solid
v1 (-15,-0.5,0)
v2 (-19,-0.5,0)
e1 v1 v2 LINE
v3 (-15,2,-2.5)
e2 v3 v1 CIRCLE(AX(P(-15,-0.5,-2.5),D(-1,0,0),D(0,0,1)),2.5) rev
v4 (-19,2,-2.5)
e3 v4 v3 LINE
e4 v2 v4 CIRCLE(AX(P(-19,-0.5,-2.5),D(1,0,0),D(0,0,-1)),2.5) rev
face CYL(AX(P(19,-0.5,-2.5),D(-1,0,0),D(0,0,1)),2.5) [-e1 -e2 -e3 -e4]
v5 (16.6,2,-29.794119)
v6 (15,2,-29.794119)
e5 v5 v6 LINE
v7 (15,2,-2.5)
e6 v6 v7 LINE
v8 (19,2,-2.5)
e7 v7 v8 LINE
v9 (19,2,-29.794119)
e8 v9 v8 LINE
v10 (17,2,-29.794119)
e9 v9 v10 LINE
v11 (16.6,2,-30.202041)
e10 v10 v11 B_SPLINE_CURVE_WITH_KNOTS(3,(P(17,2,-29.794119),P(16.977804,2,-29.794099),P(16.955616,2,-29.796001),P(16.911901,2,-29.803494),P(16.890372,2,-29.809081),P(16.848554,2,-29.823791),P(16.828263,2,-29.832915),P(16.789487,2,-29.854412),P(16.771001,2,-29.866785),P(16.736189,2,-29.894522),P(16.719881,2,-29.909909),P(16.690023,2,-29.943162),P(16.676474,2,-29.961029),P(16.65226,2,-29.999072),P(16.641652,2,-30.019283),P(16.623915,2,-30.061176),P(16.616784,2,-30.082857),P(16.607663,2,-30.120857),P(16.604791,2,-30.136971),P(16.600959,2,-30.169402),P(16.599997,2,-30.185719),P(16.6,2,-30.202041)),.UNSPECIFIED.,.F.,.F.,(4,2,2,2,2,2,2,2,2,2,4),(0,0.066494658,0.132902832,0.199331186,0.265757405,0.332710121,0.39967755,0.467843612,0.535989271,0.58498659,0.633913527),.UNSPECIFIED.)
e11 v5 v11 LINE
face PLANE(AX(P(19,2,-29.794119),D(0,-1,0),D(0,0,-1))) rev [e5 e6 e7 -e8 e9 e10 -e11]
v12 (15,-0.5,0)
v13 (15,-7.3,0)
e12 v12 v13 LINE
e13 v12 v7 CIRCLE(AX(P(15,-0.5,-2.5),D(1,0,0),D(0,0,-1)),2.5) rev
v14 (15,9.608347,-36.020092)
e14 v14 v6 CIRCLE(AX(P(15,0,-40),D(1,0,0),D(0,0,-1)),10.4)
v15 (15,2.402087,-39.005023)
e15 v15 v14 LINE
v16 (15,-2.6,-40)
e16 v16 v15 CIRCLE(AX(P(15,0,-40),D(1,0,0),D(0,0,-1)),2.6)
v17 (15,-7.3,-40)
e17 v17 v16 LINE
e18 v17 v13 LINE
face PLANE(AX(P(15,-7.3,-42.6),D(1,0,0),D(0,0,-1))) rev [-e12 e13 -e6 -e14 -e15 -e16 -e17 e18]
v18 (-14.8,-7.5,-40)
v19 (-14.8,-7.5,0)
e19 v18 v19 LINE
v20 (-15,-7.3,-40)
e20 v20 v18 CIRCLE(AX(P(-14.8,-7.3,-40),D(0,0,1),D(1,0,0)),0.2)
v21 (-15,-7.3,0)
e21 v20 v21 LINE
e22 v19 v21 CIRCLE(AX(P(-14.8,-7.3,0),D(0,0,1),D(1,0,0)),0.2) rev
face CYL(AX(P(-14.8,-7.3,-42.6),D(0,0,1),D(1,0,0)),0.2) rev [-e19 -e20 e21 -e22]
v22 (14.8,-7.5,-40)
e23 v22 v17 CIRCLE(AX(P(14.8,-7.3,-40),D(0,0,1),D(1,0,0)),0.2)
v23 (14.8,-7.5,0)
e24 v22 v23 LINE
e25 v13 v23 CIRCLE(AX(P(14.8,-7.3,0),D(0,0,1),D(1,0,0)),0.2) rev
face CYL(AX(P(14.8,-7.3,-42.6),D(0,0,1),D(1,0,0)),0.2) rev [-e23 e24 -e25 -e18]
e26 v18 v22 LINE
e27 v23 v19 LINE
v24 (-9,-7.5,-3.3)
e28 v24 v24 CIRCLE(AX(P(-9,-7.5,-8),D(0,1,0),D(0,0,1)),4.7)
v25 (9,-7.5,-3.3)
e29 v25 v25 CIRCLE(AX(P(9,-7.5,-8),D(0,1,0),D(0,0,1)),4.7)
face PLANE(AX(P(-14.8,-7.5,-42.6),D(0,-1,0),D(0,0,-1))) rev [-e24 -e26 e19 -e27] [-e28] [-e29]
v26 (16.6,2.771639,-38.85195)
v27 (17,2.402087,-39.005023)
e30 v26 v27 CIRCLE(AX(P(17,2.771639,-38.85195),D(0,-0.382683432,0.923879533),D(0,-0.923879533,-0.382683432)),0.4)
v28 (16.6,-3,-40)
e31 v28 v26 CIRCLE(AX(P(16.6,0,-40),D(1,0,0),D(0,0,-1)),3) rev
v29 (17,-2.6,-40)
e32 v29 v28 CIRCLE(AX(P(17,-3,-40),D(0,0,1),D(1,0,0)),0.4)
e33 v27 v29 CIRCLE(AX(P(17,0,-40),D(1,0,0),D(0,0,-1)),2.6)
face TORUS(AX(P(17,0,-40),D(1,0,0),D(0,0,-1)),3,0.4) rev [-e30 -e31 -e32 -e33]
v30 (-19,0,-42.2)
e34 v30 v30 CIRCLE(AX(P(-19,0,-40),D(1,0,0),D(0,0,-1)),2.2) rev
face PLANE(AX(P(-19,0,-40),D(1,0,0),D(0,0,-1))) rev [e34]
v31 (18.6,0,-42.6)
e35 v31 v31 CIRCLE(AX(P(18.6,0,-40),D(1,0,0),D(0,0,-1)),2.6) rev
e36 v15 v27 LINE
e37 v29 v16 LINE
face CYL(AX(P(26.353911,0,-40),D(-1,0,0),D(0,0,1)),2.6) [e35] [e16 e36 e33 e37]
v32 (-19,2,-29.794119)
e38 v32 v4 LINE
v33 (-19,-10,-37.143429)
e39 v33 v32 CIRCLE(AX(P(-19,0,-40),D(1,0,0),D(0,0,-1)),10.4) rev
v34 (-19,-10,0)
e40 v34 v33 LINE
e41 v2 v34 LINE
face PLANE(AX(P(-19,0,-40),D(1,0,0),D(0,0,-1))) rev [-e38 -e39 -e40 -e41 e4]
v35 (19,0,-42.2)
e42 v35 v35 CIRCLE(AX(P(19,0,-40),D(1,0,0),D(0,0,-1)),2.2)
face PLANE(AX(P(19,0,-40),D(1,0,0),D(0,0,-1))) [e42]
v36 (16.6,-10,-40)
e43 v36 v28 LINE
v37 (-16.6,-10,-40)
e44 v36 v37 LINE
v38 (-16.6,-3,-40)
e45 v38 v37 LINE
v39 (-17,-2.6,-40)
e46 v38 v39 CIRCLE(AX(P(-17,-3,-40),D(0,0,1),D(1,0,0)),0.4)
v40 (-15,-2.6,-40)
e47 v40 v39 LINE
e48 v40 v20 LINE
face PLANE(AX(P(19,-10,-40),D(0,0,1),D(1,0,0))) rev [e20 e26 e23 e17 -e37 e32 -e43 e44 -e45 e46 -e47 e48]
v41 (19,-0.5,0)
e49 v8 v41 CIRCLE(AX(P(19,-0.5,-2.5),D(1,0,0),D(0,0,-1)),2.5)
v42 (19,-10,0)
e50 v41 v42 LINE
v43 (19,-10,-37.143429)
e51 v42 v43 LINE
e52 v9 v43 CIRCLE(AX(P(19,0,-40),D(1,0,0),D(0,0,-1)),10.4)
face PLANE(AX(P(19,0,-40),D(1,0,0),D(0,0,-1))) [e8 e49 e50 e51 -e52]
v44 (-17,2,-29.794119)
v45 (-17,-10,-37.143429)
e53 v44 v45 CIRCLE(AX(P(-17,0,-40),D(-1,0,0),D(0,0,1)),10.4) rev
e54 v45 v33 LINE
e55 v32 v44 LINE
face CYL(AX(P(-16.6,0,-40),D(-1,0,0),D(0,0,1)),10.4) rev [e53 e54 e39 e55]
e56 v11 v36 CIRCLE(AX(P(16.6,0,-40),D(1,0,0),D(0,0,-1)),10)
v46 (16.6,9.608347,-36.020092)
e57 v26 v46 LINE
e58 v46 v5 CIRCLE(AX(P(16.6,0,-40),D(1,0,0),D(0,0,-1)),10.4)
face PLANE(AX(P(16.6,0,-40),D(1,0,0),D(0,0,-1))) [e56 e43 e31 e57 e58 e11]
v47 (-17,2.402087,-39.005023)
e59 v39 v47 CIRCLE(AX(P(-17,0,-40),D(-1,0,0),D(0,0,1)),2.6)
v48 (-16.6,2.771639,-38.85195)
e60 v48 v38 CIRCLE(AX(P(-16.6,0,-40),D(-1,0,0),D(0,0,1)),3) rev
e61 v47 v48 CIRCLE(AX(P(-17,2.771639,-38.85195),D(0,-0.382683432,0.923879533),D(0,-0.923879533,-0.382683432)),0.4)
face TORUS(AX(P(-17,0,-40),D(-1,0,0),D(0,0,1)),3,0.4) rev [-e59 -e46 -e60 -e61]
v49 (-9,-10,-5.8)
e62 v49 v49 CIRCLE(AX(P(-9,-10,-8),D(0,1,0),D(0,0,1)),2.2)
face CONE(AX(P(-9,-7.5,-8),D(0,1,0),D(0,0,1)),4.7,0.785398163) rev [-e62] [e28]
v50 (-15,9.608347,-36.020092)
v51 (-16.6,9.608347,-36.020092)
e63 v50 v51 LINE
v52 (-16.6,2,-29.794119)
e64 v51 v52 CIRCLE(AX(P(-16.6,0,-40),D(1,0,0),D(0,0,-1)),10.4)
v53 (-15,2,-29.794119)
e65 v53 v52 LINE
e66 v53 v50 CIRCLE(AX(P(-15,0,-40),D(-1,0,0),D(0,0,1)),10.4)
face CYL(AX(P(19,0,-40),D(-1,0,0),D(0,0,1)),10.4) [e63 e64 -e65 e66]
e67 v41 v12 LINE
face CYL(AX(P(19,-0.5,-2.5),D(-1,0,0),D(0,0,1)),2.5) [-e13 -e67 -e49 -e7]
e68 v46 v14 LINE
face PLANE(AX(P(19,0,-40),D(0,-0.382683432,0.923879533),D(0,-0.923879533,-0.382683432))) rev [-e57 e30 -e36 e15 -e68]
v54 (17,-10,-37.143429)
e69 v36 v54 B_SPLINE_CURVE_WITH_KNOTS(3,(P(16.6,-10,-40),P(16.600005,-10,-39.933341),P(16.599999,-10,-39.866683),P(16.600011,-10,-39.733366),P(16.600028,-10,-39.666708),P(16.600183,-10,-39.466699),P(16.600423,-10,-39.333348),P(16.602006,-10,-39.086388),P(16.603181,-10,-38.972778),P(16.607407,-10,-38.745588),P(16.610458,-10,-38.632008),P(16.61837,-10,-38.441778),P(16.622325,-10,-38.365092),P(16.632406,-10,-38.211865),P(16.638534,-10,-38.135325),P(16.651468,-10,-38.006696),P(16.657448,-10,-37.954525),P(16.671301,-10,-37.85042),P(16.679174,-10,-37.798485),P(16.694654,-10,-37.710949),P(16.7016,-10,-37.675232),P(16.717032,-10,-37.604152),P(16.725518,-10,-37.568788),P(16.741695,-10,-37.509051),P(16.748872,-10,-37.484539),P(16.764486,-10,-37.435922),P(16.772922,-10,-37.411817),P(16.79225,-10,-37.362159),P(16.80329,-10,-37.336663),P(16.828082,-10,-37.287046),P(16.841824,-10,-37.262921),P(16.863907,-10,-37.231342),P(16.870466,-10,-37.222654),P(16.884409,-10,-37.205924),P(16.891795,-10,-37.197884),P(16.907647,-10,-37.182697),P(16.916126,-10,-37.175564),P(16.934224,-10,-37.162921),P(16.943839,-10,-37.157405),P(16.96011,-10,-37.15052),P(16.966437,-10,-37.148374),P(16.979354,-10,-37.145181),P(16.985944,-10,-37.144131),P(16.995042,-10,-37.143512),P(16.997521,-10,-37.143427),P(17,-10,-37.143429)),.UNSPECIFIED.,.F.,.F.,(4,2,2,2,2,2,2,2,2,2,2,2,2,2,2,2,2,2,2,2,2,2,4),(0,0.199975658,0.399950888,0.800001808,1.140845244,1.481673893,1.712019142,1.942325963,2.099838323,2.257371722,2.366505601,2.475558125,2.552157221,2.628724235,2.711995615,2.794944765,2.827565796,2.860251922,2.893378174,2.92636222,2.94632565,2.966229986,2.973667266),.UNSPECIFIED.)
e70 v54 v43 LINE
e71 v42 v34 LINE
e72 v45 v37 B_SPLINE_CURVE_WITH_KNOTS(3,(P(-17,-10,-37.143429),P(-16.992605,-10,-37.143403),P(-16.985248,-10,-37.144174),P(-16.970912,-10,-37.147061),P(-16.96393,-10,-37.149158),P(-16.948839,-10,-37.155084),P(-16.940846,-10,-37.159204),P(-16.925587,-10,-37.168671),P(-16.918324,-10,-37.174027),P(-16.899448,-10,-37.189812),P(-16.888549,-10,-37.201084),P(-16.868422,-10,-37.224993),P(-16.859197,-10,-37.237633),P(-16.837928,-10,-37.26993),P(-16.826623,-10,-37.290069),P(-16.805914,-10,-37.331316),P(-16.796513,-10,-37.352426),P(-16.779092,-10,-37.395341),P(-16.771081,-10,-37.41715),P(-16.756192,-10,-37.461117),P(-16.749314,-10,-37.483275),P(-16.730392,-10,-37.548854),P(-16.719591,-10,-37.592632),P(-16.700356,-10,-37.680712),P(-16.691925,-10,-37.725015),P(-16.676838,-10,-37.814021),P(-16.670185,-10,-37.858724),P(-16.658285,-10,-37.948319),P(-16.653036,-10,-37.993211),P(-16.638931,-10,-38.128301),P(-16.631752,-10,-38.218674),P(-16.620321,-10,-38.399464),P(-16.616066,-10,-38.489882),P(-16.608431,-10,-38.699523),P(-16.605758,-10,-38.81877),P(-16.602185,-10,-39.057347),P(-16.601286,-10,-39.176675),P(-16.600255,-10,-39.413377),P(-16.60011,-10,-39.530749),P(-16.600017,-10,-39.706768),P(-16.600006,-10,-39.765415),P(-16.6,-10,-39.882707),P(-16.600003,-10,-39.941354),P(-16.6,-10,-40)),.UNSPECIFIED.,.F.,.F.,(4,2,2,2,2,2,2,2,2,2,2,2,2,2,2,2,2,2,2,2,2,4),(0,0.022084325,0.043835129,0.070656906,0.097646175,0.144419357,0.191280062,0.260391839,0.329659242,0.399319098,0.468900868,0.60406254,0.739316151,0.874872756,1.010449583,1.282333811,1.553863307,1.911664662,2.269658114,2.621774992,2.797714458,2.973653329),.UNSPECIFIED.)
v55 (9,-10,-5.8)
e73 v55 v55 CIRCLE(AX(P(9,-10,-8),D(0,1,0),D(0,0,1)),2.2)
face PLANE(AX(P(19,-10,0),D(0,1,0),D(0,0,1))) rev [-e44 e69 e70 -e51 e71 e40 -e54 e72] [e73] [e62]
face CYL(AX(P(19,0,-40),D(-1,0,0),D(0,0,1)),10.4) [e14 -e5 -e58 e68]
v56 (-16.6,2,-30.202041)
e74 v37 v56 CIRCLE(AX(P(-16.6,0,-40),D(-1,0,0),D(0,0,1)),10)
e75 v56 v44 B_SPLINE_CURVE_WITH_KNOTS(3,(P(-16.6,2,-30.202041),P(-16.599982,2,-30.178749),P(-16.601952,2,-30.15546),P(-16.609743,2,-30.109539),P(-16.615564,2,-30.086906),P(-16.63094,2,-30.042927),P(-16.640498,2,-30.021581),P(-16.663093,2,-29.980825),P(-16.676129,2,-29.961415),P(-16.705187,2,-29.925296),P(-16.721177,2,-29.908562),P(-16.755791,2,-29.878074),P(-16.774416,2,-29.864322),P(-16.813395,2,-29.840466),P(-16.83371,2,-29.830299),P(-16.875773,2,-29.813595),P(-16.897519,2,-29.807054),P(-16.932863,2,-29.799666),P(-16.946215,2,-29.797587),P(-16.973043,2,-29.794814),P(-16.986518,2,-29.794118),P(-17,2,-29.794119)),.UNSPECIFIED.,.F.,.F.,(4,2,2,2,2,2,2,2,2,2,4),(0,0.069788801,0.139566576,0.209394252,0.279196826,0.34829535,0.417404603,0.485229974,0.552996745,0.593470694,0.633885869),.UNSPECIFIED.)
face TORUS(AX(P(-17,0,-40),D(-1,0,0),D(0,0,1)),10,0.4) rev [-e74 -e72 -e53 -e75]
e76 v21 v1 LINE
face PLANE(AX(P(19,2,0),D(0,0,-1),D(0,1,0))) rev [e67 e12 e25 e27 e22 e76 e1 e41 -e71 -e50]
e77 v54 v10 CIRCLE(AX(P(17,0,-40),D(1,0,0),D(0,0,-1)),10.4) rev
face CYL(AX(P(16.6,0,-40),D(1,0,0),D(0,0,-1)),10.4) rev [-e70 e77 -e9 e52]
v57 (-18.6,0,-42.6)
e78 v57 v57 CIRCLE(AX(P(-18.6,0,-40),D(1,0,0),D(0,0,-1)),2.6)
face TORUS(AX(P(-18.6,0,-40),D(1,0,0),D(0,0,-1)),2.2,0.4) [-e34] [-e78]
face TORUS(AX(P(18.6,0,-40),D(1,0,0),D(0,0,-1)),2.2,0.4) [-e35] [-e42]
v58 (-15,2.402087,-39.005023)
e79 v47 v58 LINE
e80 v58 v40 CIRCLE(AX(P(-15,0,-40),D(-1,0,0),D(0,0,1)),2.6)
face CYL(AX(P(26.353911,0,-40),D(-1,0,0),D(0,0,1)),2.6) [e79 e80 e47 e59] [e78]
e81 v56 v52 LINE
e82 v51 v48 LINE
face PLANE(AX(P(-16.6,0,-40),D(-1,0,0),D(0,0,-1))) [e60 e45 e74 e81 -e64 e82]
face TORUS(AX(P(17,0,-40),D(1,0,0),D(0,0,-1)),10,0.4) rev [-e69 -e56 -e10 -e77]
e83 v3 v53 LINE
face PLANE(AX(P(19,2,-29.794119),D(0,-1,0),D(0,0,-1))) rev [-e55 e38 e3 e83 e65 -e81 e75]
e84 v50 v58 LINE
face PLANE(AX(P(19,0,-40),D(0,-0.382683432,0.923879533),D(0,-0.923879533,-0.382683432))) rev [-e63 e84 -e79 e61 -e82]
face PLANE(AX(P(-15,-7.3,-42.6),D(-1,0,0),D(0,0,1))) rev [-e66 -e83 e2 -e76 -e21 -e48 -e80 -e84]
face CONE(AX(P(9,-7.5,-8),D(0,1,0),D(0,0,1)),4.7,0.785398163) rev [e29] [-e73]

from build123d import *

# Parameters (mm, degrees)
BOSS_EXTRUDE5_START             = -19
BOSS_EXTRUDE5_DEPTH             = 38
CUT_EXTRUDE1_START              = -2.4
CUT_EXTRUDE1_DEPTH              = 2.4
BOSS_EXTRUDE4_REACH             = 47.398
SKETCH5_R                       = 2.6
BOSS_EXTRUDE4_DIRECTION_2_REACH = 47.398
CUT_EXTRUDE3_DEPTH              = 48.70492637
CUT_EXTRUDE3_DEPTH_BACK         = 48.70492637
FILLET17_R                      = 0.4
FILLET_1_R                      = 2.5
HOLE_WIZARD_M41_D               = 4.2
HOLE_WIZARD_M41_DEPTH           = 8.5
HOLE_WIZARD_M41_CSINK_D         = 9.4
HOLE_WIZARD_M41_CSINK_ANGLE     = 90
HOLE_WIZARD_M41_TIP             = 1.2618073


# Read off the part's stored shape, not the designer's step: Boss-Extrude5
with BuildPart() as part:
    # Boss-Extrude5 outline → Boss-Extrude5 (new body)
    with BuildSketch(Plane(origin=(0, 0, 0), x_dir=(0, 0, -1), z_dir=(1, 0, 0)).offset(BOSS_EXTRUDE5_START)):
        with BuildLine():
            Line((0, -10), (40, -10))
            Line((40, -10), (40, 0))
            Line((40, 0), (36.020092303, 9.608347138))
            ThreePointArc((36.020092303, 9.608347138), (31.951342699, 6.586282384), (29.794119342, 2))
            Line((29.794119342, 2), (0, 2))
            Line((0, 2), (0, -10))
        make_face()
    extrude(amount=BOSS_EXTRUDE5_DEPTH)

    # Sketch4 → Cut-Extrude1 (cut)
    with BuildSketch(Plane(origin=(19, 0, 0), x_dir=(0, 0, -1), z_dir=(1, 0, 0)).offset(CUT_EXTRUDE1_START)):
        with BuildLine():
            Line((32.646089476, 7.353910524), (50.4, 25.107821049))
            Line((50.4, 25.107821049), (50.4, 0))
            ThreePointArc((50.4, 0), (36.020092303, -9.608347138), (32.646089476, 7.353910524))
        make_face()
    cut_extrude1 = extrude(amount=CUT_EXTRUDE1_DEPTH, mode=Mode.SUBTRACT)

    # Mirror1: Cut-Extrude1 across plane
    add(cut_extrude1.mirror(Plane(origin=(0, 0, 0), x_dir=(0, 0, 1), z_dir=(1, 0, 0))), mode=Mode.SUBTRACT)

    # Boss-Extrude4: up to this face of the body (flat: up to its plane)
    boss_extrude4_end = Plane(part.part.faces().sort_by_distance((19, -4.194169539, -15.691958581))[0])
    # Sketch5 → Boss-Extrude4 (add, up to the picked face)
    with BuildSketch(Plane(origin=(0, 0, 0), x_dir=(0, 0, -1), z_dir=(1, 0, 0)), mode=Mode.PRIVATE) as boss_extrude4_sk1:
        with Locations((40, 0)):
            Circle(SKETCH5_R)
    boss_extrude4_tool1 = split(extrude(boss_extrude4_sk1.sketch, amount=BOSS_EXTRUDE4_REACH, mode=Mode.PRIVATE), bisect_by=boss_extrude4_end, keep=Keep.BOTH, mode=Mode.PRIVATE)
    add(boss_extrude4_tool1.solids().sort_by(Axis((0, 0, -40), (1, 0, 0)))[0])

    # Boss-Extrude4 direction 2: up to this face of the body (flat: up to its plane)
    boss_extrude4_direction_2_end = Plane(part.part.faces().sort_by_distance((-19, -4.194169539, -15.691958581))[0])
    # Sketch5 → Boss-Extrude4 direction 2 (add, up to the picked face)
    with BuildSketch(Plane(origin=(0, 0, 0), x_dir=(0, 0, -1), z_dir=(1, 0, 0)), mode=Mode.PRIVATE) as boss_extrude4_direction_2_sk1:
        with Locations((40, 0)):
            Circle(SKETCH5_R)
    boss_extrude4_direction_2_tool1 = split(extrude(boss_extrude4_direction_2_sk1.sketch, amount=-BOSS_EXTRUDE4_DIRECTION_2_REACH, mode=Mode.PRIVATE), bisect_by=boss_extrude4_direction_2_end, keep=Keep.BOTH, mode=Mode.PRIVATE)
    add(boss_extrude4_direction_2_tool1.solids().sort_by(Axis((0, 0, -40), (-1, 0, 0)))[0])

    # Sketch7 → Cut-Extrude3 (cut, two sides: drawn at the far end of the back side and taken through both)
    with BuildSketch(Plane.XY.offset(-CUT_EXTRUDE3_DEPTH_BACK)):
        with BuildLine():
            Line((-14.8, -7.5), (14.8, -7.5))
            ThreePointArc((14.8, -7.5), (14.941421356, -7.441421356), (15, -7.3))
            Line((15, -7.3), (15, 12.3))
            ThreePointArc((15, 12.3), (14.941421356, 12.441421356), (14.8, 12.5))
            Line((14.8, 12.5), (-14.8, 12.5))
            ThreePointArc((-14.8, 12.5), (-14.941421356, 12.441421356), (-15, 12.3))
            Line((-15, 12.3), (-15, -7.3))
            ThreePointArc((-15, -7.3), (-14.941421356, -7.441421356), (-14.8, -7.5))
        make_face()
    extrude(amount=CUT_EXTRUDE3_DEPTH + CUT_EXTRUDE3_DEPTH_BACK, mode=Mode.SUBTRACT)

    # Fillet17
    fillet17_edges = [part.edges().sort_by_distance(p)[0] for p in [
        (-19, 0, -37.4),
        (19, 0, -37.4),
        (-16.6, -0.507234837, -37.449958271),
        (16.6, -0.507234837, -37.449958271),
        (16.6, -5.431674396, -31.13112672),
        (-16.6, -5.431674396, -31.13112672),
    ]]
    fillet(fillet17_edges, radius=FILLET17_R)

    # Скругление1
    fillet_1_edges = [part.edges().sort_by_distance(p)[0] for p in [
        (17, 2, 0),
        (-17, 2, 0),
    ]]
    fillet(fillet_1_edges, radius=FILLET_1_R)

    # Зенковка для винта с полупотайной головкой M41
    with Locations(Plane(origin=(-9, -7.5, -8), x_dir=(0, 0, 1), z_dir=(0, 1, 0))):
        with Locations((0, 0), (0, 18)):
            CounterSinkHole(HOLE_WIZARD_M41_D / 2, HOLE_WIZARD_M41_CSINK_D / 2, depth=HOLE_WIZARD_M41_DEPTH, counter_sink_angle=HOLE_WIZARD_M41_CSINK_ANGLE)
            with Locations((0, 0, -(HOLE_WIZARD_M41_DEPTH + HOLE_WIZARD_M41_TIP / 2))):  # 118° drill point
                Cone(0, HOLE_WIZARD_M41_D / 2, HOLE_WIZARD_M41_TIP, mode=Mode.SUBTRACT)


solid = part.part
